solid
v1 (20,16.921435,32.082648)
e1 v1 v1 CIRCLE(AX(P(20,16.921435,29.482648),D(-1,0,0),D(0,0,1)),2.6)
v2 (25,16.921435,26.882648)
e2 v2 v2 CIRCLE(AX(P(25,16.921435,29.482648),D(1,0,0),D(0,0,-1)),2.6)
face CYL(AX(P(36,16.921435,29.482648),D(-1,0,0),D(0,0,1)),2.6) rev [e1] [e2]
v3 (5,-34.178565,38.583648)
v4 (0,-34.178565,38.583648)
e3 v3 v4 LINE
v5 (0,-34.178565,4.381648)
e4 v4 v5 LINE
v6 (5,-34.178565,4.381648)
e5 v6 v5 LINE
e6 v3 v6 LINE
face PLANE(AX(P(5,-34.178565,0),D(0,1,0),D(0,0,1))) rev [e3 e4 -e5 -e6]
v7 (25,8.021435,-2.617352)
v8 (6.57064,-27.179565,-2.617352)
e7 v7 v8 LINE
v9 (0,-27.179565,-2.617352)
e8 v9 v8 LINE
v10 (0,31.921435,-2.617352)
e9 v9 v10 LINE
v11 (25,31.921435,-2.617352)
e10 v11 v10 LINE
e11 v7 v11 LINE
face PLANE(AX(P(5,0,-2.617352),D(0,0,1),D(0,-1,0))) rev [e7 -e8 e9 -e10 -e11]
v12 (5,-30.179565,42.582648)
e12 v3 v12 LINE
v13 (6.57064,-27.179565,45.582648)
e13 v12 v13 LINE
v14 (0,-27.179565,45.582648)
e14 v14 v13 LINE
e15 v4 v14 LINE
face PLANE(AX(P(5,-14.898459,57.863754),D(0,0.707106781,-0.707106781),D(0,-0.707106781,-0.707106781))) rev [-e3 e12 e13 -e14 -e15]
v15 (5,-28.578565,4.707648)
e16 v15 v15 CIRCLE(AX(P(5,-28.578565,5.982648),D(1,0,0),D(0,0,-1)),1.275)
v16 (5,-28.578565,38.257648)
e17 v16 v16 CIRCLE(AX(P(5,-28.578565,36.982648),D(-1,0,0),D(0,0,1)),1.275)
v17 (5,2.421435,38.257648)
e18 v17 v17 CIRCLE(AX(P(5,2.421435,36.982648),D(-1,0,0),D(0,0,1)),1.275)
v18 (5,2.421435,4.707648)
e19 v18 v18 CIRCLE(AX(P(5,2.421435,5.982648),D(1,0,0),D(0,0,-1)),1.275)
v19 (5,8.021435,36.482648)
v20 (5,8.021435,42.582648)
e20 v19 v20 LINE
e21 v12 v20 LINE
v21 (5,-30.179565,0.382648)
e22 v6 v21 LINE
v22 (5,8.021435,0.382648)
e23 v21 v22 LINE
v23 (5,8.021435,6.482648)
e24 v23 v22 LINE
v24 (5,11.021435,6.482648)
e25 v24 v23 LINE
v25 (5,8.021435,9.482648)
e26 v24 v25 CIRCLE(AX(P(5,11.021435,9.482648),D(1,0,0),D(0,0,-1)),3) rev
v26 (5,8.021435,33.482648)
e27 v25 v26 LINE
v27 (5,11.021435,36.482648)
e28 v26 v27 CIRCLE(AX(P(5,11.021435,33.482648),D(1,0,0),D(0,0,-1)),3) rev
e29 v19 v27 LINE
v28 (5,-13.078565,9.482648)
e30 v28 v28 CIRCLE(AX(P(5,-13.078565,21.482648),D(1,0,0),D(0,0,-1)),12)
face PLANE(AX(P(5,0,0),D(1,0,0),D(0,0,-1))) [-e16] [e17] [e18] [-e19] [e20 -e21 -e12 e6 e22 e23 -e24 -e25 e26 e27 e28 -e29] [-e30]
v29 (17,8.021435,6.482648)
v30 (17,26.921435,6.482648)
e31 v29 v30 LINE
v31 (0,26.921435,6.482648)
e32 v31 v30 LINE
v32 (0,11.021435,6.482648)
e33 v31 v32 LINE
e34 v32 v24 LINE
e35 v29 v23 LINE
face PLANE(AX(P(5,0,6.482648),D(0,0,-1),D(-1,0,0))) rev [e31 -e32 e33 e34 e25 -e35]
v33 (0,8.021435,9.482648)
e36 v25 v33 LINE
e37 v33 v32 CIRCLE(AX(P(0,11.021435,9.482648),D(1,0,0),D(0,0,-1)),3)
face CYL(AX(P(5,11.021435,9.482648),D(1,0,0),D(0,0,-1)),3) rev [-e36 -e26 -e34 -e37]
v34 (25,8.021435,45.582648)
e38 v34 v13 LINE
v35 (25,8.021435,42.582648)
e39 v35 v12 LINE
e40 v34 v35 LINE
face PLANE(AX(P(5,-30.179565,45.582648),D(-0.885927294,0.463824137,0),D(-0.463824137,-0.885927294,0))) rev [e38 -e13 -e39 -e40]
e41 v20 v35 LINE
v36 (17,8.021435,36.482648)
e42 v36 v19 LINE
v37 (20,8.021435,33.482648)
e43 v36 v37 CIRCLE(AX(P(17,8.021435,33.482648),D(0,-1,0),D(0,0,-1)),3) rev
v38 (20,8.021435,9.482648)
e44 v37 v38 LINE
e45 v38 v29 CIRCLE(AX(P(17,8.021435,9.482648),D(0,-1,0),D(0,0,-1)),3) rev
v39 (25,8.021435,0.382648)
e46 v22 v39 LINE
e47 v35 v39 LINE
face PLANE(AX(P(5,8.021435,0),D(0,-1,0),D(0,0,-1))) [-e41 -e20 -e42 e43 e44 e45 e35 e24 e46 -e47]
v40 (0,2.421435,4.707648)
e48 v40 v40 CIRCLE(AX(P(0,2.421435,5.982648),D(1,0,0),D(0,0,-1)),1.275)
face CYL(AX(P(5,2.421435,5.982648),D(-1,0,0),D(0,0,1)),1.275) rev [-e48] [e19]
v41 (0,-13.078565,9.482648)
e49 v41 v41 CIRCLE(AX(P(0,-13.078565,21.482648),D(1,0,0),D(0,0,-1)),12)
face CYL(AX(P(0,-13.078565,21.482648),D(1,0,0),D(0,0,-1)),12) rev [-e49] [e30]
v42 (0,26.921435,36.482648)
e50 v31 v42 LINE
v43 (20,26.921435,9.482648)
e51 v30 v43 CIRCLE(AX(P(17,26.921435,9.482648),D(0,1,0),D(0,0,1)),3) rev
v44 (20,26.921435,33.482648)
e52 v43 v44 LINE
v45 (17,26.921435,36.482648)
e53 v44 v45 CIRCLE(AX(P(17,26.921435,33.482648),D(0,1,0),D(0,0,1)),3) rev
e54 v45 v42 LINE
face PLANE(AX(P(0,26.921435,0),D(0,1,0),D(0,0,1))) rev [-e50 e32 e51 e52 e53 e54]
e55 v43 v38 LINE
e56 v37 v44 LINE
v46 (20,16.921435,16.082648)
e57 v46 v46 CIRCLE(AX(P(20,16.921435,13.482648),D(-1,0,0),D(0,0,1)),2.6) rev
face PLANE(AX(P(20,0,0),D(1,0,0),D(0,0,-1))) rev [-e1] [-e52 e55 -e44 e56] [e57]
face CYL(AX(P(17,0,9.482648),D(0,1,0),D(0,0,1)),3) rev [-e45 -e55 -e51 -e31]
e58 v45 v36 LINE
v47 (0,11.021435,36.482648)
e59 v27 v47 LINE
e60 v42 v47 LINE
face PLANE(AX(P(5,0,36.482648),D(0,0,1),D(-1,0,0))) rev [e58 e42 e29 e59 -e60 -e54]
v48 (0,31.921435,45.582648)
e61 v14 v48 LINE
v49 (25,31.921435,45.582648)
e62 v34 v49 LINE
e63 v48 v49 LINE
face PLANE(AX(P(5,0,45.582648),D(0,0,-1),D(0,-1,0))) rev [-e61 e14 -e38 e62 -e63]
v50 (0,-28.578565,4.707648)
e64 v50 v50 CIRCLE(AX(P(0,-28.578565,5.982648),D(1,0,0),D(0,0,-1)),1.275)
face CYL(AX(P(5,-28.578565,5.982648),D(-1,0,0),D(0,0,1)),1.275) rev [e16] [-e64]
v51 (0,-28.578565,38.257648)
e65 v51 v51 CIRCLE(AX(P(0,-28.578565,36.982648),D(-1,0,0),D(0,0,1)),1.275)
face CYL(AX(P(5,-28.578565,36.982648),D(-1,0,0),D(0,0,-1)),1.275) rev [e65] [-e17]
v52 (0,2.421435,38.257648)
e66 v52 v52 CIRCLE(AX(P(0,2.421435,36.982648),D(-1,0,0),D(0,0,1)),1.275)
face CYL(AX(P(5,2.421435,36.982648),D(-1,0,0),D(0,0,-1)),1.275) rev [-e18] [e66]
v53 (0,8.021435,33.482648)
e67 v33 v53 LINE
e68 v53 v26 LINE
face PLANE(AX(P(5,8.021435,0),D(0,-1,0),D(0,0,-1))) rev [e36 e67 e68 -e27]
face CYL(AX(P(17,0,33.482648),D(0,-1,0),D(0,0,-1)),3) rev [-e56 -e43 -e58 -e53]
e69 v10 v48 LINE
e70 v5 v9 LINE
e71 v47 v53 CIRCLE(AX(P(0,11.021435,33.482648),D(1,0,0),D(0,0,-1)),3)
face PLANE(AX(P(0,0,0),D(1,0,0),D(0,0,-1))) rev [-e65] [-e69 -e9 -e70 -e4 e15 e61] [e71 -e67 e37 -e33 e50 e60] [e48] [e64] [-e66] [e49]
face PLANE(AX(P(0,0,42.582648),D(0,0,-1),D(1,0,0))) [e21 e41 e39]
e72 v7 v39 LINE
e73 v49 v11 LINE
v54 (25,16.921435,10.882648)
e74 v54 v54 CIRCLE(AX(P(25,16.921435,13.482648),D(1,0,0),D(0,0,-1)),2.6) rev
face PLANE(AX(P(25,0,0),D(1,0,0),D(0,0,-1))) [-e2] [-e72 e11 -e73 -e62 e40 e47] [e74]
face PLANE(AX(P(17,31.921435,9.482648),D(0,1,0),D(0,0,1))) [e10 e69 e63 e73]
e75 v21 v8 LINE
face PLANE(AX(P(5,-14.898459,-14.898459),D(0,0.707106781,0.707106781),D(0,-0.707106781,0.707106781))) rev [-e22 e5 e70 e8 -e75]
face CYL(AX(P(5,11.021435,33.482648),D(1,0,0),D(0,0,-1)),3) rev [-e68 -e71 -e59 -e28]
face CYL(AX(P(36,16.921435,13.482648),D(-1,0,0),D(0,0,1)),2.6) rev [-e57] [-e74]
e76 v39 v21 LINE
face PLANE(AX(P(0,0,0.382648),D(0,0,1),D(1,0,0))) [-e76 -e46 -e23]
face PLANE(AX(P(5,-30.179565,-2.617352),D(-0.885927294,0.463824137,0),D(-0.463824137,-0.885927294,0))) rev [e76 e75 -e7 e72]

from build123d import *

# Parameters (mm, degrees)
SKETCH1_R           = 1.275
BOSS_EXTRUDE1_DEPTH = 5
SKETCH2_W           = 9.1
SKETCH2_H           = 17.8
BOSS_EXTRUDE2_DEPTH = 20
BOSS_EXTRUDE3_DEPTH = 3
CUT_EXTRUDE1_DEPTH  = 15
SKETCH7_W           = 24.2
SKETCH7_H           = 42.2
BOSS_EXTRUDE4_DEPTH = 5
SKETCH8_R           = 12
CUT_EXTRUDE3_DEPTH  = 5
SKETCH10_W          = 48.2
SKETCH10_H          = 17.8
BOSS_EXTRUDE5_DEPTH = 5
FILLET1_R           = 3
BOSS_EXTRUDE6_START = 6.1
BOSS_EXTRUDE6_DEPTH = 6.1
SKETCH13_R          = 2.6
CUT_EXTRUDE4_DEPTH  = 16
FILLET2_R           = 3
SKETCH14_W          = 25
SKETCH14_H          = 48.2
BOSS_EXTRUDE7_DEPTH = 5


with BuildPart() as part:
    # Sketch1 → Boss-Extrude1 (new body)
    # profile 1 of 2: a face of its own
    with BuildSketch(Plane(origin=(0, 0, 0), x_dir=(0, 0, -1), z_dir=(1, 0, 0))):
        Polygon((-4.381647728, -34.17856484), (-0.382647728, -30.17956484), (-0.382647728, 8.02143516), (-6.482647728, 8.02143516), (-9.382647728, 8.02143516), (-9.382647728, -34.17856484), align=None)
        with Locations((-5.982647728, 2.42143516)):
            Circle(SKETCH1_R, mode=Mode.SUBTRACT)
        with Locations((-5.982647728, -28.57856484)):
            Circle(SKETCH1_R, mode=Mode.SUBTRACT)
    # profile 2 of 2: a face of its own
    with BuildSketch(Plane(origin=(0, 0, 0), x_dir=(0, 0, -1), z_dir=(1, 0, 0))):
        Polygon((2.617352272, 8.02143516), (2.617352272, 25.82143516), (-6.482647728, 25.82143516), (-6.482647728, 8.02143516), (-0.382647728, 8.02143516), align=None)
    extrude(amount=BOSS_EXTRUDE1_DEPTH)

    # Sketch2 → Boss-Extrude2 (add)
    with BuildSketch(Plane(origin=(5, 0, 0), x_dir=(0, 0, -1), z_dir=(1, 0, 0))):
        with Locations((-1.932647728, 16.92143516)):
            Rectangle(SKETCH2_W, SKETCH2_H)
    extrude(amount=BOSS_EXTRUDE2_DEPTH)

    # Sketch3 → Boss-Extrude3 (add)
    with BuildSketch(Plane(origin=(0, 0, 0.382647728), x_dir=(-1, 0, 0), z_dir=(0, 0, -1))):
        Polygon((-25, 8.02143516), (0, 8.02143516), (0, -30.17956484), (-5, -30.17956484), align=None)
    extrude(amount=BOSS_EXTRUDE3_DEPTH)

    # Sketch4 → Cut-Extrude1 (cut, symmetric)
    with BuildSketch(Plane(origin=(5, 0, 0), x_dir=(0, 0, -1), z_dir=(1, 0, 0))):
        Polygon((-0.382647728, -30.17956484), (2.617352272, -27.17956484), (2.617352272, -30.17956484), align=None)
    extrude(amount=CUT_EXTRUDE1_DEPTH, both=True, mode=Mode.SUBTRACT)


with BuildPart() as body_2:
    # Mirror14: mirrored copy
    add(part.part.mirror(Plane.XY.offset(21.482647728)))


with BuildPart() as part_1:
    add(part.part)

    add(body_2.part)  # Boss-Extrude4 merges body 2
    # Sketch7 → Boss-Extrude4 (add)
    with BuildSketch(Plane(origin=(5, 0, 0), x_dir=(0, 0, -1), z_dir=(1, 0, 0))):
        with Locations((-21.482647728, -13.07856484)):
            Rectangle(SKETCH7_W, SKETCH7_H)
    extrude(amount=-BOSS_EXTRUDE4_DEPTH)

    # Sketch8 → Cut-Extrude3 (cut)
    with BuildSketch(Plane(origin=(5, 0, 0), x_dir=(0, 0, -1), z_dir=(1, 0, 0))):
        with Locations((-21.482647728, -13.07856484)):
            Circle(SKETCH8_R)
    extrude(amount=-CUT_EXTRUDE3_DEPTH, mode=Mode.SUBTRACT)

    # Sketch10 → Boss-Extrude5 (add)
    with BuildSketch(Plane(origin=(25, 0, 0), x_dir=(0, 0, -1), z_dir=(1, 0, 0))):
        with Locations((-21.482647728, 16.92143516)):
            Rectangle(SKETCH10_W, SKETCH10_H)
    extrude(amount=-BOSS_EXTRUDE5_DEPTH)

    # Fillet1
    fillet1_edges = [part_1.edges().sort_by_distance(p)[0] for p in [
        (20, 16.92143516, 36.482647728),
        (20, 16.92143516, 6.482647728),
    ]]
    fillet(fillet1_edges, radius=FILLET1_R)

    # Sketch12 → Boss-Extrude6 (add)
    with BuildSketch(Plane(origin=(0, 25.82143516, 0), x_dir=(1, 0, 0), z_dir=(0, 1, 0)).offset(BOSS_EXTRUDE6_START)):
        with BuildLine():
            Line((25, 2.617352272), (0, 2.617352272))
            Line((0, 2.617352272), (0, -6.482647728))
            Line((0, -6.482647728), (17, -6.482647728))
            ThreePointArc((17, -6.482647728), (19.121320344, -7.361327384), (20, -9.482647728))
            Line((20, -9.482647728), (20, -33.482647728))
            ThreePointArc((20, -33.482647728), (19.121320344, -35.603968072), (17, -36.482647728))
            Line((17, -36.482647728), (0, -36.482647728))
            Line((0, -36.482647728), (0, -45.582647728))
            Line((0, -45.582647728), (25, -45.582647728))
            Line((25, -45.582647728), (25, 2.617352272))
        make_face()
    extrude(amount=-BOSS_EXTRUDE6_DEPTH)

    # Sketch13 → Cut-Extrude4 (cut)
    with BuildSketch(Plane.ZY.offset(-20)):
        with Locations((29.482647728, 16.92143516)):
            Circle(SKETCH13_R)
        with Locations((13.482647728, 16.92143516)):
            Circle(SKETCH13_R)
    extrude(amount=-CUT_EXTRUDE4_DEPTH, mode=Mode.SUBTRACT)

    # Fillet2
    # the kernel refuses this fillet: 3 mm, written as the material it adds along each edge
    with BuildSketch(Plane(origin=(0, 8.02143516, 6.482647728), x_dir=(0, 1, 0), z_dir=(1, 0, 0)), Plane(origin=(0, 8.02143516, 36.482647728), x_dir=(0, 0, -1), z_dir=(1, 0, 0))) as fillet2_piece_1:
        with BuildLine():
            CenterArc((FILLET2_R, FILLET2_R), FILLET2_R, 180, 90)
            Line((0, FILLET2_R), (0, 0))
            Line((0, 0), (FILLET2_R, 0))
        make_face()
    extrude(amount=5)

    # Sketch14 → Boss-Extrude7 (add)
    with BuildSketch(Plane(origin=(0, 31.92143516, 0), x_dir=(1, 0, 0), z_dir=(0, 1, 0))):
        with Locations((12.5, -21.482647728)):
            Rectangle(SKETCH14_W, SKETCH14_H)
    extrude(amount=-BOSS_EXTRUDE7_DEPTH)


solid = part_1.part
